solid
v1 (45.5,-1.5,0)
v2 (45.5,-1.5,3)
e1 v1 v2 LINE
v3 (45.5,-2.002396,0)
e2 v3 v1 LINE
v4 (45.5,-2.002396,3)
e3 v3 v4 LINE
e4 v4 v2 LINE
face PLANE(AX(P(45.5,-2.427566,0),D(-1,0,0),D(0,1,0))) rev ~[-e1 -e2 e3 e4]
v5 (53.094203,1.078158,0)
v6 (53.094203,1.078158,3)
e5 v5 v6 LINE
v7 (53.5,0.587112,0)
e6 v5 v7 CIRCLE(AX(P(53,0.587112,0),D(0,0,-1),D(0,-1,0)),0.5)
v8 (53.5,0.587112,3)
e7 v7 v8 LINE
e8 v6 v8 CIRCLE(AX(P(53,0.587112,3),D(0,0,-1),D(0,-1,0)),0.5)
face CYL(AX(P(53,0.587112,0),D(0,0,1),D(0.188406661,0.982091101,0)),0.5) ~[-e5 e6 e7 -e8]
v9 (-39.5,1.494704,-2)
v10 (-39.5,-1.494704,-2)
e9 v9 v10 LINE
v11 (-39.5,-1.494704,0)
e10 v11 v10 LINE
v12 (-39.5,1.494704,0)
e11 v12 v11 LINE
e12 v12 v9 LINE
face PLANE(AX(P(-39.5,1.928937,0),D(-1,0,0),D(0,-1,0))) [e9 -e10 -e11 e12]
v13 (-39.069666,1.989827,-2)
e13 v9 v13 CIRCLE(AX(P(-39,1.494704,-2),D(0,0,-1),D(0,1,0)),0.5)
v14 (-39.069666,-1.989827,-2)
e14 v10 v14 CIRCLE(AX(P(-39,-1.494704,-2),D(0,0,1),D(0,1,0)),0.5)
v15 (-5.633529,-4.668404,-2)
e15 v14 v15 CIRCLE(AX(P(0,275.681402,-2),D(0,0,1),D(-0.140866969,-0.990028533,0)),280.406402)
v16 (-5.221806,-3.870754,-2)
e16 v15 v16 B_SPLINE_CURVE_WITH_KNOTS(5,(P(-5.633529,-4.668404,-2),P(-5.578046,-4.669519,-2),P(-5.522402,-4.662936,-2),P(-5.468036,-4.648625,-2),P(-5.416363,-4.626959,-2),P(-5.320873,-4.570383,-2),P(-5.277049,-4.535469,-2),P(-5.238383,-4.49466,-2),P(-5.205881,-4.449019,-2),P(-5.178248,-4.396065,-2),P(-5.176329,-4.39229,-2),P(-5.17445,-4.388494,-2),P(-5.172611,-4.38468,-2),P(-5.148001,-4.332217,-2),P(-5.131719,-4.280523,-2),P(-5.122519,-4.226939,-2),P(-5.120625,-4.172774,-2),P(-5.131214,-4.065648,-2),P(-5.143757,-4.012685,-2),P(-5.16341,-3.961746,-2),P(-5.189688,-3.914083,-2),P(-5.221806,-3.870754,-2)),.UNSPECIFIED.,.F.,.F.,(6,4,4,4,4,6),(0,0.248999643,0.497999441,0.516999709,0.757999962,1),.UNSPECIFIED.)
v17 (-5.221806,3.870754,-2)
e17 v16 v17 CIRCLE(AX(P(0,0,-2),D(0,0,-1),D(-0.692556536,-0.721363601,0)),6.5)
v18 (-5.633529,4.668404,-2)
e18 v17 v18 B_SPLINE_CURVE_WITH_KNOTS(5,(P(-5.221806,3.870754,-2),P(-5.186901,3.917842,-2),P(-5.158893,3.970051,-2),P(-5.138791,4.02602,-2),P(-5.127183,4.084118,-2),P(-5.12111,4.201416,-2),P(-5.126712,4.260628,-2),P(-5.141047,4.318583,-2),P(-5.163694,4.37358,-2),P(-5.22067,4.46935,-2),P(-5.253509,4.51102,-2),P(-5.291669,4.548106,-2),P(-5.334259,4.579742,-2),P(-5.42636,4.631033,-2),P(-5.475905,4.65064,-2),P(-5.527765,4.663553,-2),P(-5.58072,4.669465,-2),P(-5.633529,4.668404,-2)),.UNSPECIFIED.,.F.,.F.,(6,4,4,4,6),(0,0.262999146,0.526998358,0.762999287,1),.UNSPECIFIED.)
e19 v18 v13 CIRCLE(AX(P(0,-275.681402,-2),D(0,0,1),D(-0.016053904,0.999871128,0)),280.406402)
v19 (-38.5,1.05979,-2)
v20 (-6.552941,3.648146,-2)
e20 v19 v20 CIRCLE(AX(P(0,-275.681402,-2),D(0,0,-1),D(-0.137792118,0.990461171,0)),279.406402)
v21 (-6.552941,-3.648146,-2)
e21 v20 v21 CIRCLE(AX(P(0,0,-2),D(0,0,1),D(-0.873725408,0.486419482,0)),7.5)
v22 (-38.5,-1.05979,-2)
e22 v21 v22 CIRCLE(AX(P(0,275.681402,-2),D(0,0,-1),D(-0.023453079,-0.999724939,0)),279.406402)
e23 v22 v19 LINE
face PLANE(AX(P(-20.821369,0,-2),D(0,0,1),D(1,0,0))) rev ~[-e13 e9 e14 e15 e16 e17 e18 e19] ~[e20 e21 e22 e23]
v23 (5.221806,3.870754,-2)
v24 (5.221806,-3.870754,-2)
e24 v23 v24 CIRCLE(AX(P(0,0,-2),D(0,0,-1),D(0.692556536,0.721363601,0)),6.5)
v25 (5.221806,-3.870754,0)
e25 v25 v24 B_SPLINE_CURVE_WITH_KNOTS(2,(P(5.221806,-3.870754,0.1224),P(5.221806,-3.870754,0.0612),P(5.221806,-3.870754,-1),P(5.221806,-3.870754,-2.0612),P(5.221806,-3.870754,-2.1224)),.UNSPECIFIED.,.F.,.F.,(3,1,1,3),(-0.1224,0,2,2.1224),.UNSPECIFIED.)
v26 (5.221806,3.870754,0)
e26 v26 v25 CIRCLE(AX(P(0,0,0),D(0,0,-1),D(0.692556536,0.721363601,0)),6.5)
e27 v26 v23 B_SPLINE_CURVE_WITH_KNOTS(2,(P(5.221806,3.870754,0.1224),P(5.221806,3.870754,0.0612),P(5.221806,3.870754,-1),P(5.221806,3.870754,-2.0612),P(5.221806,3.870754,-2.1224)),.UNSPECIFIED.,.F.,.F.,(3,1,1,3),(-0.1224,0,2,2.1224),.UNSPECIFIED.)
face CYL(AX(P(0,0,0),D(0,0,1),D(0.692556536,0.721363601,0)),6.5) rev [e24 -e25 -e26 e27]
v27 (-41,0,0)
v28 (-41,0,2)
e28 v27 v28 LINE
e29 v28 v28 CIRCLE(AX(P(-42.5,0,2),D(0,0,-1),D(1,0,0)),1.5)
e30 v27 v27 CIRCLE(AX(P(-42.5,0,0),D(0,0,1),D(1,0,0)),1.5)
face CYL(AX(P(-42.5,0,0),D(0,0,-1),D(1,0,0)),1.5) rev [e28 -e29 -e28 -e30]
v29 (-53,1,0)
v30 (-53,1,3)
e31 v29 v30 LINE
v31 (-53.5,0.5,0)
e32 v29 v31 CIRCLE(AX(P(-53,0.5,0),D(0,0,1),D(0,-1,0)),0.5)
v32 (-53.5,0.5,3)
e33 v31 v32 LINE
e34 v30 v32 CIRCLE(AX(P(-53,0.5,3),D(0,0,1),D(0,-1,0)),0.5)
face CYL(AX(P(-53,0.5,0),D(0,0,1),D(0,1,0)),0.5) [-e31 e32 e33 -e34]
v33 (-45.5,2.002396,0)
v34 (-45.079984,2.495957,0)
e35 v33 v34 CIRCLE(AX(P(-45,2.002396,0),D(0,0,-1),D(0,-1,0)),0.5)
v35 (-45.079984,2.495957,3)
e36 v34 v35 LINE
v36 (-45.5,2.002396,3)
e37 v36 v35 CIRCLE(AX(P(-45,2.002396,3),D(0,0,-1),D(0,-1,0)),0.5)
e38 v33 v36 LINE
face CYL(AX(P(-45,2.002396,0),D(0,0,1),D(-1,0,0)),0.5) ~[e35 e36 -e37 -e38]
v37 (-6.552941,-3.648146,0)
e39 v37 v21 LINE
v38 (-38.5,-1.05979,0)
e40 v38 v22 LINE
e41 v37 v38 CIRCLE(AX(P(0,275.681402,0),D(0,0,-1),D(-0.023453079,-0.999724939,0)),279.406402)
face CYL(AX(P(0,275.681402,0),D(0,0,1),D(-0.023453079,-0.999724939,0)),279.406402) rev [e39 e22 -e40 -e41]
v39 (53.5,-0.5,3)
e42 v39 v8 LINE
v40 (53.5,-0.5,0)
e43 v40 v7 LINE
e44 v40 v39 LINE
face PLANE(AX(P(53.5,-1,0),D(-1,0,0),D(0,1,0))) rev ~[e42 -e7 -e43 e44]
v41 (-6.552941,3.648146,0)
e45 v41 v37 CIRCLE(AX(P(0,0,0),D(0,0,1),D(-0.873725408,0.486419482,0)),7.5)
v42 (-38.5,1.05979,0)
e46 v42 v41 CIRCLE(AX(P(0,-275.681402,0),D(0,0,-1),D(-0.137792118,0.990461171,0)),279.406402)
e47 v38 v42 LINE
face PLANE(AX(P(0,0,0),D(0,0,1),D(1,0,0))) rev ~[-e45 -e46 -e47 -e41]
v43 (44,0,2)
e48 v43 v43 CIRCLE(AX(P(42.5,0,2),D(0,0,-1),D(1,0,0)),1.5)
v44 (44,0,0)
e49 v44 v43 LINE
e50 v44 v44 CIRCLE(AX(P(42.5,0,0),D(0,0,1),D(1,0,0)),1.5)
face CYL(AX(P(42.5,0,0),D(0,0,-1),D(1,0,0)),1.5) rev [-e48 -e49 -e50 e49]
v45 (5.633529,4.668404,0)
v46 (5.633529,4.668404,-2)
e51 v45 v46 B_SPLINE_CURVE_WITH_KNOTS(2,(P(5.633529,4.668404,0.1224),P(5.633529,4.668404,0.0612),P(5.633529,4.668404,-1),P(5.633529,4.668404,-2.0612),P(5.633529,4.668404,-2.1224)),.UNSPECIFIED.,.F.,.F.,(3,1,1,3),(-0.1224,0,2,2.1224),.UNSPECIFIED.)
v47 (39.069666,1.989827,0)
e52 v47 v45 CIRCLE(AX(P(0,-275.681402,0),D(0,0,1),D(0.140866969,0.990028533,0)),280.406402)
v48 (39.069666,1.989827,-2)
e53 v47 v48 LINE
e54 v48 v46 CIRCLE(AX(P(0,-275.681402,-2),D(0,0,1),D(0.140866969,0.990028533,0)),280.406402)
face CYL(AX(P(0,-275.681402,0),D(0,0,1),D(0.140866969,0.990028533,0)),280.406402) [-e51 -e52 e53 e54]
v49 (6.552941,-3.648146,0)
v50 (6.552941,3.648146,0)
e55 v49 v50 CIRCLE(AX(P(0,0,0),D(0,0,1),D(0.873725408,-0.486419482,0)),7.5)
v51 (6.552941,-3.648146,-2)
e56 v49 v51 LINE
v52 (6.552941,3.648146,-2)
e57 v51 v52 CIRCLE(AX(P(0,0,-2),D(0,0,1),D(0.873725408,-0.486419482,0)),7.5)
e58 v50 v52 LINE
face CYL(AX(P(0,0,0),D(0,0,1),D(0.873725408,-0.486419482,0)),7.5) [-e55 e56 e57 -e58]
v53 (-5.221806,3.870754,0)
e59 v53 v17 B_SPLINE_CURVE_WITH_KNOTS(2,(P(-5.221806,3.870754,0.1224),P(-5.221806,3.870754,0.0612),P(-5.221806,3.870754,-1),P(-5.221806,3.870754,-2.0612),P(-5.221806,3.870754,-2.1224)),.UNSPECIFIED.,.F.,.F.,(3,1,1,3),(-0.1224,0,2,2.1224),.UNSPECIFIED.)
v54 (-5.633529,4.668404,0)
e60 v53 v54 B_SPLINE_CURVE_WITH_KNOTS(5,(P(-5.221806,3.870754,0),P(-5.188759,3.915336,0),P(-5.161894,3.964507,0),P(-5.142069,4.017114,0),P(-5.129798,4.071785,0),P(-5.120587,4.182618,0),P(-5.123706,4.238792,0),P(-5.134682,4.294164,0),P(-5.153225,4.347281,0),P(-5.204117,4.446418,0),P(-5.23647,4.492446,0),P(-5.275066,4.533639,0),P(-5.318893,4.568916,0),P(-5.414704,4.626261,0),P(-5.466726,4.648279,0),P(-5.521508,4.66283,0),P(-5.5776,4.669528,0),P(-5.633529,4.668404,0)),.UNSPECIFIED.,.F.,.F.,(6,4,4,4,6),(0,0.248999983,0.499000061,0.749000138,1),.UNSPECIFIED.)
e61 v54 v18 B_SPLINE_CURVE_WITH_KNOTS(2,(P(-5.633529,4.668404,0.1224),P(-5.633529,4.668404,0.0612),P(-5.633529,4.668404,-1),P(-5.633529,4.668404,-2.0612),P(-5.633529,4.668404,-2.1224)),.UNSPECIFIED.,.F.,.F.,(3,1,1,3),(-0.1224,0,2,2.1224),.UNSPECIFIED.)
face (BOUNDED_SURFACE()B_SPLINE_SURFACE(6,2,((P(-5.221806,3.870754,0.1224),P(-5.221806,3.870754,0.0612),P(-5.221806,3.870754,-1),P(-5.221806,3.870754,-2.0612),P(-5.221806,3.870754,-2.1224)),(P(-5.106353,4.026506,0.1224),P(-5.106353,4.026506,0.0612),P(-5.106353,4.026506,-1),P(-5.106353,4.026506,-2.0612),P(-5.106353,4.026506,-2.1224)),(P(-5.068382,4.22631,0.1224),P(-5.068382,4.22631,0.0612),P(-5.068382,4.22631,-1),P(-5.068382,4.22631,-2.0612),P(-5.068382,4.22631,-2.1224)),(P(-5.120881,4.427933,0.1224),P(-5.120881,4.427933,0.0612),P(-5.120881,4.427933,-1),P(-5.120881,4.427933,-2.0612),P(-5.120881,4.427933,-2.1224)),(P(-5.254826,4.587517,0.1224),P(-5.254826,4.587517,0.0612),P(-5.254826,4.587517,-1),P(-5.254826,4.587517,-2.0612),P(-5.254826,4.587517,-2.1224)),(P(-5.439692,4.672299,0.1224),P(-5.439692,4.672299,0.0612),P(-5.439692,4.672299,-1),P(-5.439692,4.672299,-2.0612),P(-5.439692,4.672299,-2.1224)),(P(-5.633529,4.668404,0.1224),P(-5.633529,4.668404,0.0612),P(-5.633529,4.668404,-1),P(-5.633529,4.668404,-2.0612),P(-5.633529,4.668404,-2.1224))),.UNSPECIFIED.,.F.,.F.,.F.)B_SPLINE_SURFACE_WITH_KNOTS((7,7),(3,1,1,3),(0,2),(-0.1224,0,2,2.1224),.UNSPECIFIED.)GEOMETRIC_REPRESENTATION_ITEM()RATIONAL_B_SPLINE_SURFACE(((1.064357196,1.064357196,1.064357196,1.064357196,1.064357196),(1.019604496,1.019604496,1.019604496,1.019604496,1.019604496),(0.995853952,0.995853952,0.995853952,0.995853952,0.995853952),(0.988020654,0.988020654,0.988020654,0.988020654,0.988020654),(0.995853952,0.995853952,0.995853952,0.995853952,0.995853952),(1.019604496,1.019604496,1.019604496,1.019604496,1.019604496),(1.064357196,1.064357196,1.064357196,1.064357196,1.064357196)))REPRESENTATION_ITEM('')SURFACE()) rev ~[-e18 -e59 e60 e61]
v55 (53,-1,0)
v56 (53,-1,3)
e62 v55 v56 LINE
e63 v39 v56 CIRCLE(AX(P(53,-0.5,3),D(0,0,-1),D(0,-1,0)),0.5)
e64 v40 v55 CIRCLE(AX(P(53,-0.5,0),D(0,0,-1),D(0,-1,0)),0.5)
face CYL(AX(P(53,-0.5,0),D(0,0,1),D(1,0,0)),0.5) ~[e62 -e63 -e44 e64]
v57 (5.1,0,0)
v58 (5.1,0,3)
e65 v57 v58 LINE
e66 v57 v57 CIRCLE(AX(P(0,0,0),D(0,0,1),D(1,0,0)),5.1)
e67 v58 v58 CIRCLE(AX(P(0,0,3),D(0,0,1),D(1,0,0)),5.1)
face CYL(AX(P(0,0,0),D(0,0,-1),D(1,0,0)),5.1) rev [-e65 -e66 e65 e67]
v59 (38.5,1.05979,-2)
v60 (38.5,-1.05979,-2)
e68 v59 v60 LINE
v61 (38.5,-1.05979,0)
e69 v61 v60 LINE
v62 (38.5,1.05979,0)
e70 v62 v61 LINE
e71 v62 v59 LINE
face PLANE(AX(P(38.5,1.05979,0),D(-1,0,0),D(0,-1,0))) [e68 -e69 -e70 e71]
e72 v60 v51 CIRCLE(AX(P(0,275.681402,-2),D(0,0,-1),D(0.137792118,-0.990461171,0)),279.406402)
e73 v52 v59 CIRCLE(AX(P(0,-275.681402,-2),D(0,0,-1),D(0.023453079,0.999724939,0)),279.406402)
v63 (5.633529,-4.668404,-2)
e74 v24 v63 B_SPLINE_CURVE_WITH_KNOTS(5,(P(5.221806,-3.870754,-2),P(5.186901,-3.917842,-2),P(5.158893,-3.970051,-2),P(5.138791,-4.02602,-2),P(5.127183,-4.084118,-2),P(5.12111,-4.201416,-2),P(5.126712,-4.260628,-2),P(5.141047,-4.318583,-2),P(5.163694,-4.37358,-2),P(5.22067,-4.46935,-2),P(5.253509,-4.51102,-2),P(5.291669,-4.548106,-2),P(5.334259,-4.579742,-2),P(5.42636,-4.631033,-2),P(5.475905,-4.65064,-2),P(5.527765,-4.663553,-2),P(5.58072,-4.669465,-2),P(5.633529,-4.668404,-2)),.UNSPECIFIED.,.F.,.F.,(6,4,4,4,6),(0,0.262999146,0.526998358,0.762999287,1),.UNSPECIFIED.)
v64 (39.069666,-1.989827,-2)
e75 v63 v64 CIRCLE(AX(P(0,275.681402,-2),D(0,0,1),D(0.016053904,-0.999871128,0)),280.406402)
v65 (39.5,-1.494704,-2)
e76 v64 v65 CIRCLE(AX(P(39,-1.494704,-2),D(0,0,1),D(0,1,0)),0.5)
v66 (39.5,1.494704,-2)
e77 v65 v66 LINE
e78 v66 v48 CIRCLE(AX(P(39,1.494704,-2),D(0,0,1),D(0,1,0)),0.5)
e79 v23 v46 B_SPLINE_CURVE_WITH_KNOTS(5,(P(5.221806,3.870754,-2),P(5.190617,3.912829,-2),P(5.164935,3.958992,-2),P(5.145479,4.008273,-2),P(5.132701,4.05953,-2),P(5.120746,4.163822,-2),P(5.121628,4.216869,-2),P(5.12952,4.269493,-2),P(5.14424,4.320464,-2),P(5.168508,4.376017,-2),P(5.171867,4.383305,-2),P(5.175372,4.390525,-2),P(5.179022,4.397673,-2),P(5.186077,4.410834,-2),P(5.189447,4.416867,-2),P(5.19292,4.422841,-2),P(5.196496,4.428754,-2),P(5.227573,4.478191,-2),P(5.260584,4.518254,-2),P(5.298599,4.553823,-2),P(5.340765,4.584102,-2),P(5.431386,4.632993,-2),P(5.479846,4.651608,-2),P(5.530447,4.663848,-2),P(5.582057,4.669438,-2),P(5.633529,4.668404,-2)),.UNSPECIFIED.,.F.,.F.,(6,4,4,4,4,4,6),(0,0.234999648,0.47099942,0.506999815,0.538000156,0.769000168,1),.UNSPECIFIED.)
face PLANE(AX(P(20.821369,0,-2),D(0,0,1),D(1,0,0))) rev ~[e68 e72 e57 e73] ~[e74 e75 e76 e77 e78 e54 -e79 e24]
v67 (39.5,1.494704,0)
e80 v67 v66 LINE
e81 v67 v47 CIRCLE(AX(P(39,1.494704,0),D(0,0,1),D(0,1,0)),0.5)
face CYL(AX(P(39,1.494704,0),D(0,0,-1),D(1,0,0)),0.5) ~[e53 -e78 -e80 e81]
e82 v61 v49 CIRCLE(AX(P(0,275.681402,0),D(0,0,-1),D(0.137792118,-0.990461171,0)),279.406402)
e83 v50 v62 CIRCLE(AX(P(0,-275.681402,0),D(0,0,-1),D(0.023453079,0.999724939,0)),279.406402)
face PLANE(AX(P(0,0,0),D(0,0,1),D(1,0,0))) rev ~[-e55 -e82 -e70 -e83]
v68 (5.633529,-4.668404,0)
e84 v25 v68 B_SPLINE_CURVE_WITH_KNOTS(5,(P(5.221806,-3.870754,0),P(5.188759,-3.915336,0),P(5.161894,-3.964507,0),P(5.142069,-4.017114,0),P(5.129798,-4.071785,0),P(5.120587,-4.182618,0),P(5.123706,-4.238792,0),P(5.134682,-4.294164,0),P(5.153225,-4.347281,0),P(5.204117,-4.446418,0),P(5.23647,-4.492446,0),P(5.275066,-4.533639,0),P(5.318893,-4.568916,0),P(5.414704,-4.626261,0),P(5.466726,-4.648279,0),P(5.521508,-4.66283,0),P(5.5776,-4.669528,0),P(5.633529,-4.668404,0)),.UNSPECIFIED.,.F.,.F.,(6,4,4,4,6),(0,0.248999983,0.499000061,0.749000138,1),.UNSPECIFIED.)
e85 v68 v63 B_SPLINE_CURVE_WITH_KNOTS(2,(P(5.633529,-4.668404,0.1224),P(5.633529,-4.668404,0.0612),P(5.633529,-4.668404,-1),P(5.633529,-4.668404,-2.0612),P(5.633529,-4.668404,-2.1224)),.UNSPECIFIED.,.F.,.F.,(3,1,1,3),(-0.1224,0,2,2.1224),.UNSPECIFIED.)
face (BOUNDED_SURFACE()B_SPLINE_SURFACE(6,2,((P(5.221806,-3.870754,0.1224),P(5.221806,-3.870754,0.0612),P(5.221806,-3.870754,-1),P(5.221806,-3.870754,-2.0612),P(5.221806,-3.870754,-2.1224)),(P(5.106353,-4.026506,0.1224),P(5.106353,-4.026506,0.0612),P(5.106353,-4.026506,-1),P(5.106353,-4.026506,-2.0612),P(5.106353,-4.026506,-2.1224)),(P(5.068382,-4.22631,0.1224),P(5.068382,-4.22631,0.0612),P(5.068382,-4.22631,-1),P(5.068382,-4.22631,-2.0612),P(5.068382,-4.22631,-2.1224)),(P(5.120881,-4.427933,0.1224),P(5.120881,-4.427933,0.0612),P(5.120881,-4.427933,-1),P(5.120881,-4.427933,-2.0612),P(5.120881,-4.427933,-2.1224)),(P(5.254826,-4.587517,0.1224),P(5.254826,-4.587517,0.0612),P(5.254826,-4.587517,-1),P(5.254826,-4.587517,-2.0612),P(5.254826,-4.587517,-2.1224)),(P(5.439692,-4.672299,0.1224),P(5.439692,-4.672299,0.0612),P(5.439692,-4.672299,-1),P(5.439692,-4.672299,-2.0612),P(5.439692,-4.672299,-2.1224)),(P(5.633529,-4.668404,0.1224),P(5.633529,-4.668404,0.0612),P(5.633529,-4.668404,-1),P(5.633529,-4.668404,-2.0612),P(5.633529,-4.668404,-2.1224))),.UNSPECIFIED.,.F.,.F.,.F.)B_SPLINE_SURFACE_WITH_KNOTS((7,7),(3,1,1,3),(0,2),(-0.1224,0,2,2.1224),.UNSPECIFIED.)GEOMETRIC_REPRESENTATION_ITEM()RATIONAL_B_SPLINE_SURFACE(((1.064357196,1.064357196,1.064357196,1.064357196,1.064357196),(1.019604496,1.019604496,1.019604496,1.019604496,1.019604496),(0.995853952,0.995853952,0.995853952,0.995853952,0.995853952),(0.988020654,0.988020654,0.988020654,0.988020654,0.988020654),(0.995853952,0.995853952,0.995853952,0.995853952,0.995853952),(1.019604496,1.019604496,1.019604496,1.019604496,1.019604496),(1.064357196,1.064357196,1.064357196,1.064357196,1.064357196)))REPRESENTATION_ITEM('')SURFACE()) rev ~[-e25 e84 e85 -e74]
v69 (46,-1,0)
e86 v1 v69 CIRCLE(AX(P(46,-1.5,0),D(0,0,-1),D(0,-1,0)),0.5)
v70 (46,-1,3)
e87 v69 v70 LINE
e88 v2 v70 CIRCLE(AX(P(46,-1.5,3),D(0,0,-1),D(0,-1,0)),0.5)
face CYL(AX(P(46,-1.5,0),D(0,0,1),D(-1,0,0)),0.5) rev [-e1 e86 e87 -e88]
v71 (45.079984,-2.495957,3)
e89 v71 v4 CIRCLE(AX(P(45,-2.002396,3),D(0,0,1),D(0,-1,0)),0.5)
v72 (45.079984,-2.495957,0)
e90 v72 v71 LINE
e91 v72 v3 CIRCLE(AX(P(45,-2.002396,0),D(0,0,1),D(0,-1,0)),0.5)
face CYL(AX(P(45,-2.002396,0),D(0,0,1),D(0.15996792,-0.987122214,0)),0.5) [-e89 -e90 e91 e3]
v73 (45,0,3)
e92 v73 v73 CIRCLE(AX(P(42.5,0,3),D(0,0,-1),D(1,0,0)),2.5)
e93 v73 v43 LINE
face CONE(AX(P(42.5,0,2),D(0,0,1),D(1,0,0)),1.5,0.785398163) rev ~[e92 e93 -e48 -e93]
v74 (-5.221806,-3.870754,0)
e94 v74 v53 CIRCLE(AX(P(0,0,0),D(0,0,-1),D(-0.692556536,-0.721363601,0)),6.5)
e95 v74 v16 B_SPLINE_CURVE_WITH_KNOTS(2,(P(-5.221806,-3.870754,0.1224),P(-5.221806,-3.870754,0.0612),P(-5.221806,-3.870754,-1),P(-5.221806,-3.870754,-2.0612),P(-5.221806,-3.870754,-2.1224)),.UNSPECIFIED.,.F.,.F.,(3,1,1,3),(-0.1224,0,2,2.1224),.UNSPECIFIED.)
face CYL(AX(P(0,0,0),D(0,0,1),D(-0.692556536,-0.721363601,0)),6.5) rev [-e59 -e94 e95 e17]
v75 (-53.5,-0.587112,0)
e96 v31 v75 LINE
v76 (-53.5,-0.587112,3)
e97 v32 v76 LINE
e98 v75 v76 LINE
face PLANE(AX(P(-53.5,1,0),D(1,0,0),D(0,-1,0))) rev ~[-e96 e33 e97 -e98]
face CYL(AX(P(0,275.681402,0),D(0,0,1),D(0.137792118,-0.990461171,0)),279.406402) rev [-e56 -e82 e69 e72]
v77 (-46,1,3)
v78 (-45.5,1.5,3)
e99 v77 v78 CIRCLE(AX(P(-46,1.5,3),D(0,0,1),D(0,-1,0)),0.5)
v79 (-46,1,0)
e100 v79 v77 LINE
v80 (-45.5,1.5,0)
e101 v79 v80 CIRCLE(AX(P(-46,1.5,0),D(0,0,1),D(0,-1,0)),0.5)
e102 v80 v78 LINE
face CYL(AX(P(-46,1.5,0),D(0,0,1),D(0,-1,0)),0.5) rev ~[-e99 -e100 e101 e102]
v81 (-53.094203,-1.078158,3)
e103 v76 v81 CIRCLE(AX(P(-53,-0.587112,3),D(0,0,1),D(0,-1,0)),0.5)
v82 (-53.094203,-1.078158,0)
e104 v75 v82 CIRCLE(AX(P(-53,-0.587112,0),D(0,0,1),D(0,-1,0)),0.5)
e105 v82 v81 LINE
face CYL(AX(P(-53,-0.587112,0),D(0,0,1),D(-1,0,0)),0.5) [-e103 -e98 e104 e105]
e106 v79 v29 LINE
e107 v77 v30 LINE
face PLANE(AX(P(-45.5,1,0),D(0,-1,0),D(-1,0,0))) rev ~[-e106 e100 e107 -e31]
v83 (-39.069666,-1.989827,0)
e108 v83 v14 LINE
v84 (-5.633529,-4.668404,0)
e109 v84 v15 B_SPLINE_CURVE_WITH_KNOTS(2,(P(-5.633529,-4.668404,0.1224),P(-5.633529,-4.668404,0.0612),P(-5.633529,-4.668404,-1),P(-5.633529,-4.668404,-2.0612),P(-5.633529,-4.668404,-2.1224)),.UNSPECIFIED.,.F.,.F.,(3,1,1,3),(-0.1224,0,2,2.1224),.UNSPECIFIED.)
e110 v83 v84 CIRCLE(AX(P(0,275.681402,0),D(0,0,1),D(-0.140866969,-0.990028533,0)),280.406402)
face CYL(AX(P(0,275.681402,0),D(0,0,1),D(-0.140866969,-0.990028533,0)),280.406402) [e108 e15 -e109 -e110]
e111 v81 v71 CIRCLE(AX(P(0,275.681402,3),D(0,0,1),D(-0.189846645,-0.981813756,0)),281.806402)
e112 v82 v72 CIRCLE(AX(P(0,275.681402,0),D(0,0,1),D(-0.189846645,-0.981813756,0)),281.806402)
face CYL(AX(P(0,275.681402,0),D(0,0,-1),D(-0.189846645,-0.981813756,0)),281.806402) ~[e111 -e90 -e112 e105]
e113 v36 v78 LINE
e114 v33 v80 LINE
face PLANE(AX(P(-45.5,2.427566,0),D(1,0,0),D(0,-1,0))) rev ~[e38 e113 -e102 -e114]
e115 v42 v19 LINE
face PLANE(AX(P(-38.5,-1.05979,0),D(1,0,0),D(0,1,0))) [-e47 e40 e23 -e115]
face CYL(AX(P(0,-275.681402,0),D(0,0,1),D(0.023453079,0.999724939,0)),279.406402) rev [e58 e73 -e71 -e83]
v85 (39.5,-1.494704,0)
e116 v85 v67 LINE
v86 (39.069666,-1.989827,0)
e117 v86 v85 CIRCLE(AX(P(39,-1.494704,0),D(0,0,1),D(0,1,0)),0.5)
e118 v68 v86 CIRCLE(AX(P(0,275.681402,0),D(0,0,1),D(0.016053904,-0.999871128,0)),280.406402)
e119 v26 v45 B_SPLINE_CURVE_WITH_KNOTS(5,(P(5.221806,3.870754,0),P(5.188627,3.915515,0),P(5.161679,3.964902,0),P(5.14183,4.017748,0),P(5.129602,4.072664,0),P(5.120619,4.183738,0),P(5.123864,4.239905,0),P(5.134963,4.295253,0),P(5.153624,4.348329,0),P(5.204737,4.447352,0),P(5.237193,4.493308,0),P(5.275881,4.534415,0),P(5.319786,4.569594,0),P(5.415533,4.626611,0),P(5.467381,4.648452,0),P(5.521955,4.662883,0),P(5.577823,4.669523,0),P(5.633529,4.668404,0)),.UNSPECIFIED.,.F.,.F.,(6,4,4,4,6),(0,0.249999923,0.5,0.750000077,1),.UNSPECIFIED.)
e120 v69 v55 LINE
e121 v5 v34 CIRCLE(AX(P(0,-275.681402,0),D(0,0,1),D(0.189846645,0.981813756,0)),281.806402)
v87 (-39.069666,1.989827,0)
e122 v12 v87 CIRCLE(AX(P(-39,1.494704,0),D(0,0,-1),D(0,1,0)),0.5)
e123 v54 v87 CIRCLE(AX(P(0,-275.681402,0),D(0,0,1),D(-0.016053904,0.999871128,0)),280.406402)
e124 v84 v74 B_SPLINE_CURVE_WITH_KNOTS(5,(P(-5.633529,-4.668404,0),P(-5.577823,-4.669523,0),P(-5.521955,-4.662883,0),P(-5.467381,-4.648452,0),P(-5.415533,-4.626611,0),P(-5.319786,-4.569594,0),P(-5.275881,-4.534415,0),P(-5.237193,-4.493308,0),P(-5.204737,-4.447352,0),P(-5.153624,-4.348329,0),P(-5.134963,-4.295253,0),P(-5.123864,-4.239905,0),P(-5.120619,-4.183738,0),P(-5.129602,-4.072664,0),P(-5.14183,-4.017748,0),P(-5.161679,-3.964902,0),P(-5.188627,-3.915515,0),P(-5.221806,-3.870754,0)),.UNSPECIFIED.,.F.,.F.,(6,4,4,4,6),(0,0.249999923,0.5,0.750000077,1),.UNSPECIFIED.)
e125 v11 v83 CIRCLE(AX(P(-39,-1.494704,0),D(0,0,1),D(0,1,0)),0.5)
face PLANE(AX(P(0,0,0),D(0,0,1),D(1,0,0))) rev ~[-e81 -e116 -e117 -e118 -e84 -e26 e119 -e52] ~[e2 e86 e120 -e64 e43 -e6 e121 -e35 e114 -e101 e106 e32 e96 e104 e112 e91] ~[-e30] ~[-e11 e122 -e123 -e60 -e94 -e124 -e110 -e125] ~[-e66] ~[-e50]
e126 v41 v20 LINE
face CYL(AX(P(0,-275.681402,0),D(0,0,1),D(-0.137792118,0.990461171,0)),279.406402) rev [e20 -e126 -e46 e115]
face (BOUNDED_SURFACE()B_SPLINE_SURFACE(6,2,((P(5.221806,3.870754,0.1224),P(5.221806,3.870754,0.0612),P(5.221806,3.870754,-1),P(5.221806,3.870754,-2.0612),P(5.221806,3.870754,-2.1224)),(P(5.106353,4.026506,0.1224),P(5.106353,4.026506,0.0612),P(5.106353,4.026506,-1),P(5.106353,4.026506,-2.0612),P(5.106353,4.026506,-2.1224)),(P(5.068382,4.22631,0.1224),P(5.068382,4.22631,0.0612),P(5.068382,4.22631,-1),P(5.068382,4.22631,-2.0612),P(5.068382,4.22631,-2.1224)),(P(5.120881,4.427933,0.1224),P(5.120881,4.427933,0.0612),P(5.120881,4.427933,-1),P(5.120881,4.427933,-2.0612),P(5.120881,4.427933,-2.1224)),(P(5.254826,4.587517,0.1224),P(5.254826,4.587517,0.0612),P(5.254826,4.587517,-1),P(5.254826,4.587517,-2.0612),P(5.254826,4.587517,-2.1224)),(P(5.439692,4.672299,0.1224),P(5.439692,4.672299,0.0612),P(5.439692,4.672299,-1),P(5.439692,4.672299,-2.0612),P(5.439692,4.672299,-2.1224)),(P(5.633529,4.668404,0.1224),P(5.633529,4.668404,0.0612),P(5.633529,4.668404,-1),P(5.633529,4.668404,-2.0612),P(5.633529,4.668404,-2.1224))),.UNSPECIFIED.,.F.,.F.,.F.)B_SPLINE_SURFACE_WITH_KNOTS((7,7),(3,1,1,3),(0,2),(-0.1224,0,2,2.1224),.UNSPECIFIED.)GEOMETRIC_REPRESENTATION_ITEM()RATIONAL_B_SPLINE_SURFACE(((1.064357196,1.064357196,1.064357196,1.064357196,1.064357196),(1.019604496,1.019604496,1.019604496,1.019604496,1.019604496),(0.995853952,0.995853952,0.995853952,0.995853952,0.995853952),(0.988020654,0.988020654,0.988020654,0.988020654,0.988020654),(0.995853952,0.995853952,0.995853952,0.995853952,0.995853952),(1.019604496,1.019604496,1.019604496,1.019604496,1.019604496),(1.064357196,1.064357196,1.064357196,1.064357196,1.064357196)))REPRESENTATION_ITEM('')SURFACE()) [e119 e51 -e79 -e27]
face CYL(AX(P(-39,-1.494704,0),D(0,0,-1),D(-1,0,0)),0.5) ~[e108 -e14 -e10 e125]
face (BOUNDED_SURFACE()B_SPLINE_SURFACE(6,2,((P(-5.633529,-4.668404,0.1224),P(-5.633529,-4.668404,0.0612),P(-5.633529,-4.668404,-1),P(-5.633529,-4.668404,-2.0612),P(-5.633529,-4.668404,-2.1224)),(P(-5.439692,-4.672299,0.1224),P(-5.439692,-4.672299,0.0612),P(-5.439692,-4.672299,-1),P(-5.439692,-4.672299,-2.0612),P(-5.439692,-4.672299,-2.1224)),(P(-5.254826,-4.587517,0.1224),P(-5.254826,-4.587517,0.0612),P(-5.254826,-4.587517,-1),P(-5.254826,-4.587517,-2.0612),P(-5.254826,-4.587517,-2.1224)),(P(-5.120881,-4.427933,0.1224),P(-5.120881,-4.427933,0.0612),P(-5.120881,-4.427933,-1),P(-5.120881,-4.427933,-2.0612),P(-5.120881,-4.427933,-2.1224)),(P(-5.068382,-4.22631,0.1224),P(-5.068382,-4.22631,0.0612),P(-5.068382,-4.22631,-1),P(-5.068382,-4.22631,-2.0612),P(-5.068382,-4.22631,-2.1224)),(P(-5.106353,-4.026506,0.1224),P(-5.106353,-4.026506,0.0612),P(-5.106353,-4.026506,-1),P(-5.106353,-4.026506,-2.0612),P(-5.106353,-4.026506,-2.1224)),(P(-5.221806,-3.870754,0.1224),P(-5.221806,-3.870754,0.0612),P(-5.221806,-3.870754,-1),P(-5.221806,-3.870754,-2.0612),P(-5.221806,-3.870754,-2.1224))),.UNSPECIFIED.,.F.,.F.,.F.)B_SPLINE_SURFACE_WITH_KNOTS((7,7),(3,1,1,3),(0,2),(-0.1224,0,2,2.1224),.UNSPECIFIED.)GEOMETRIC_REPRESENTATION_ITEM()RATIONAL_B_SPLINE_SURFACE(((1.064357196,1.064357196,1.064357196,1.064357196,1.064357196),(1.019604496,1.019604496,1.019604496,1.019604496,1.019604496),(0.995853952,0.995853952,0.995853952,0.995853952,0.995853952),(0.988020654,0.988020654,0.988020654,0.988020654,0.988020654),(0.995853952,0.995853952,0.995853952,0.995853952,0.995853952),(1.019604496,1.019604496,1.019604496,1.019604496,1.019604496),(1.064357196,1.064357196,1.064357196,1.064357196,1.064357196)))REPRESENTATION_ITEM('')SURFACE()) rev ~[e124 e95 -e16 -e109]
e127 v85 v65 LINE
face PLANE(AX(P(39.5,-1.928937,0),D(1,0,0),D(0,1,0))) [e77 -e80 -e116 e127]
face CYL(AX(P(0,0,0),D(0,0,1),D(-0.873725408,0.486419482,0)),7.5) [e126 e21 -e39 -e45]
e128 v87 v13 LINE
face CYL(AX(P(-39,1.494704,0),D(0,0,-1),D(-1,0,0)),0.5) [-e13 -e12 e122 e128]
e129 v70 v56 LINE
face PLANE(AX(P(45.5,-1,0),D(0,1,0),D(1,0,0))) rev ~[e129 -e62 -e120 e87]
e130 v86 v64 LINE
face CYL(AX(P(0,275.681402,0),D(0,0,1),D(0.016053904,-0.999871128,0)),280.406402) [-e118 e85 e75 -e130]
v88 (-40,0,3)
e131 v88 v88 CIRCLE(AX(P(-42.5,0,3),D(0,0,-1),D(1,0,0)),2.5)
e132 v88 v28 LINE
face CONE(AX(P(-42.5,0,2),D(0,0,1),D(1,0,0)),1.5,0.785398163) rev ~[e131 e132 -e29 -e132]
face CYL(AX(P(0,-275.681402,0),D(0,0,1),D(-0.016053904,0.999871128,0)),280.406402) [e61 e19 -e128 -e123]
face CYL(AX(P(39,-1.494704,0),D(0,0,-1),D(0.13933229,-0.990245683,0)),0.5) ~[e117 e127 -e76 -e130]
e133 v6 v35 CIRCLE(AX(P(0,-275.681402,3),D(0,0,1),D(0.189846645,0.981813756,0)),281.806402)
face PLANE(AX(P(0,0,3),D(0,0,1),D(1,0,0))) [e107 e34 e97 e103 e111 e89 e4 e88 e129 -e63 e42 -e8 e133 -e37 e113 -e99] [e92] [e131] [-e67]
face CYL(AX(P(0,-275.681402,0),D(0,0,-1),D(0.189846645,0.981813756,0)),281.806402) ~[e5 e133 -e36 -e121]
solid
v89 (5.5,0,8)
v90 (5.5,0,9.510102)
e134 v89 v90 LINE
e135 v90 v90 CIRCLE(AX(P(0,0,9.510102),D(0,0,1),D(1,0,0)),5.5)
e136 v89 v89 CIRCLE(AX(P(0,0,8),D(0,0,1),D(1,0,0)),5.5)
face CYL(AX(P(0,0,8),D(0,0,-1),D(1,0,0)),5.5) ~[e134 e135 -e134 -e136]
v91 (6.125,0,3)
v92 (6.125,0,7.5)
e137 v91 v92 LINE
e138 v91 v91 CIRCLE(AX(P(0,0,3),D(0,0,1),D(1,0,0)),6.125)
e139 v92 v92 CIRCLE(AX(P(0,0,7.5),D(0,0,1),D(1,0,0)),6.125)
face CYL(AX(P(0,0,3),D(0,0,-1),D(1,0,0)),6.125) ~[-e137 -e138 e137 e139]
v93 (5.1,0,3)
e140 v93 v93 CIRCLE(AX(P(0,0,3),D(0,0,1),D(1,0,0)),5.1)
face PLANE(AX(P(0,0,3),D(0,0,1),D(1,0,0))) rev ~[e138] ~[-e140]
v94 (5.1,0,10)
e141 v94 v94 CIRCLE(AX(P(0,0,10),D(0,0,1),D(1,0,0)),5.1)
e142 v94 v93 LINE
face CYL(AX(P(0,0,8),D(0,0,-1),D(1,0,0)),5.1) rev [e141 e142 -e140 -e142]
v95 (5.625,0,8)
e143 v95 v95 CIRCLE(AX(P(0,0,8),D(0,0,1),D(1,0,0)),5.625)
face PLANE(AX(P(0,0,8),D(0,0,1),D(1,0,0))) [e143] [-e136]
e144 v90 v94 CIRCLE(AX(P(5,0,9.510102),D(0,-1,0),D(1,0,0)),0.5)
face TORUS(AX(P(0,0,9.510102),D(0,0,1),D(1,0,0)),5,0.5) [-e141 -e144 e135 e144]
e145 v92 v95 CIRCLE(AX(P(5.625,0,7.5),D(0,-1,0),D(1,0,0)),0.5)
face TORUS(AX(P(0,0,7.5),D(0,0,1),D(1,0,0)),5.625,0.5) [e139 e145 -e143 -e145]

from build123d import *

# Parameters (mm, degrees)
F1_R      = 5.1
F2_DEPTH  = 3
F4_DEPTH  = 2
F7_R      = 6.125
F7_R_2    = 5.1
F8_DEPTH  = 5
F9_R      = 5.5
F9_R_2    = 5.1
F10_DEPTH = 2
F11_F1_R  = 0.5
F11_F2_R  = 0.5
F12_R     = 1.5
F13_DEPTH = 10.001
F14_SIZE  = 1


# Not quite as in the source:
# - a fillet or chamfer that OpenCascade refuses, or shapes differently, is made with other operations: its cross-section is extruded or revolved along the edge and cut away or added


with BuildPart() as f2:
    # F1 (on Top) → F2 (new body)
    with BuildSketch(Plane.XY):
        with BuildLine():
            Line((-53.5, 1), (-53.5, -1))
            ThreePointArc((-53.5, -1), (-4.0631867219, -6.095706229), (45.5, -2.4275662327))
            Line((45.5, -2.4275662327), (45.5, -1))
            Line((45.5, -1), (53.5, -1))
            Line((53.5, -1), (53.5, 1))
            ThreePointArc((53.5, 1), (4.0631867219, 6.095706229), (-45.5, 2.4275662327))
            Line((-45.5, 2.4275662327), (-45.5, 1))
            Line((-45.5, 1), (-53.5, 1))
        make_face()
        Circle(F1_R, mode=Mode.SUBTRACT)
    extrude(amount=F2_DEPTH)

    # F3 (on Top) → F4 (join)
    with BuildSketch(Plane.XY):
        with BuildLine():
            Line((-39.5, 1.9289369376), (-39.5, -1.9289369376))
            ThreePointArc((-39.5, -1.9289369376), (-22.0440441808, -3.8571649268), (-4.5016174848, -4.6888634039))
            ThreePointArc((-4.5016174848, -4.6888634039), (-6.5, 0), (-4.5016174848, 4.6888634039))
            ThreePointArc((-4.5016174848, 4.6888634039), (-22.0440441808, 3.8571649268), (-39.5, 1.9289369376))
        make_face()
        with BuildLine():
            Line((-38.5, -1.0597902373), (-38.5, 1.0597902373))
            ThreePointArc((-38.5, 1.0597902373), (-22.5636158392, 2.8124412347), (-6.5529405569, 3.6481461125))
            ThreePointArc((-6.5529405569, 3.6481461125), (-7.5, 0), (-6.5529405569, -3.6481461125))
            ThreePointArc((-6.5529405569, -3.6481461125), (-22.5636158392, -2.8124412347), (-38.5, -1.0597902373))
        make_face(mode=Mode.SUBTRACT)
        with BuildLine():
            ThreePointArc((4.5016174848, 4.6888634039), (6.5, 0), (4.5016174848, -4.6888634039))
            ThreePointArc((4.5016174848, -4.6888634039), (22.0440441808, -3.8571649268), (39.5, -1.9289369376))
            Line((39.5, -1.9289369376), (39.5, 1.9289369376))
            ThreePointArc((39.5, 1.9289369376), (22.0440441808, 3.8571649268), (4.5016174848, 4.6888634039))
        make_face()
        with BuildLine():
            ThreePointArc((6.5529405569, -3.6481461125), (7.5, 0), (6.5529405569, 3.6481461125))
            ThreePointArc((6.5529405569, 3.6481461125), (22.5636158392, 2.8124412347), (38.5, 1.0597902373))
            Line((38.5, 1.0597902373), (38.5, -1.0597902373))
            ThreePointArc((38.5, -1.0597902373), (22.5636158392, -2.8124412347), (6.5529405569, -3.6481461125))
        make_face(mode=Mode.SUBTRACT)
    extrude(amount=-F4_DEPTH)

    # F11: fillet of radius 0.5 on 16 edges, made by hand

    # F11_f1
    f11_f1_edges = [f2.edges().sort_by_distance(p)[0] for p in [
        (45.5, -1, 1.5),
        (-45.5, 1, 1.5),
    ]]
    fillet(f11_f1_edges, radius=F11_F1_R)

    # F11_f2
    f11_f2_edges = [f2.edges().sort_by_distance(p)[0] for p in [
        (53.5, -1, 1.5),
        (-45.5, 2.4275662327, 1.5),
        (-53.5, 1, 1.5),
        (-53.5, -1, 1.5),
        (-39.5, -1.9289369376, -1),
        (-39.5, 1.9289369376, -1),
        (39.5, 1.9289369376, -1),
        (39.5, -1.9289369376, -1),
        (4.5016174848, -4.6888634039, -1),
        (-4.5016174848, -4.6888634039, -1),
        (-4.5016174848, 4.6888634039, -1),
        (4.5016174848, 4.6888634039, -1),
        (53.5, 1, 1.5),
        (45.5, -2.4275662327, 1.5),
    ]]
    fillet(f11_f2_edges, radius=F11_F2_R)

    # F12 (on Top) → F13 (cut, through all)
    with BuildSketch(Plane.XY):
        with Locations((-42.5, 0)):
            Circle(F12_R)
        with Locations((42.5, 0)):
            Circle(F12_R)
    extrude(amount=F13_DEPTH, mode=Mode.SUBTRACT)

    # F14
    f14_edges = [f2.edges().sort_by_distance(p)[0] for p in [
        (-44, 0, 3),
        (41, 0, 3),
    ]]
    chamfer(f14_edges, length=F14_SIZE)


with BuildPart() as f8:
    # F7 (on face) → F8 (new body)
    with BuildSketch(Plane.XY.offset(3)):
        Circle(F7_R)
        Circle(F7_R_2, mode=Mode.SUBTRACT)
    extrude(amount=F8_DEPTH)

    # F9 (on face) → F10 (join)
    with BuildSketch(Plane.XY.offset(8)):
        Circle(F9_R)
        Circle(F9_R_2, mode=Mode.SUBTRACT)
    extrude(amount=F10_DEPTH)

    # F11#2: fillet of radius 0.5 on 2 edges, made by hand

    # F11_2_s1 → F11_2_t2 (revolve, cut)
    with BuildSketch(Plane.XZ):
        with BuildLine():
            ThreePointArc((6.125, 7.5), (5.9785533906, 7.8535533906), (5.625, 8))
            Line((5.625, 8), (6.125, 8))
            Line((6.125, 8), (6.125, 7.5))
        make_face()
    revolve(axis=Axis((0, 0, 8), (0, 0, 1)), mode=Mode.SUBTRACT)

    # F11_2_s3 → F11_2_t4 (revolve, cut)
    with BuildSketch(Plane.XZ):
        with BuildLine():
            ThreePointArc((5.5, 9.5101020514), (5.3872983346, 9.8263298175), (5.1, 10))
            Line((5.1, 10), (5.5, 10))
            Line((5.5, 10), (5.5, 9.5101020514))
        make_face()
    revolve(axis=Axis((0, 0, 10), (0, 0, 1)), mode=Mode.SUBTRACT)


solid = Compound([f2.part, f8.part])
